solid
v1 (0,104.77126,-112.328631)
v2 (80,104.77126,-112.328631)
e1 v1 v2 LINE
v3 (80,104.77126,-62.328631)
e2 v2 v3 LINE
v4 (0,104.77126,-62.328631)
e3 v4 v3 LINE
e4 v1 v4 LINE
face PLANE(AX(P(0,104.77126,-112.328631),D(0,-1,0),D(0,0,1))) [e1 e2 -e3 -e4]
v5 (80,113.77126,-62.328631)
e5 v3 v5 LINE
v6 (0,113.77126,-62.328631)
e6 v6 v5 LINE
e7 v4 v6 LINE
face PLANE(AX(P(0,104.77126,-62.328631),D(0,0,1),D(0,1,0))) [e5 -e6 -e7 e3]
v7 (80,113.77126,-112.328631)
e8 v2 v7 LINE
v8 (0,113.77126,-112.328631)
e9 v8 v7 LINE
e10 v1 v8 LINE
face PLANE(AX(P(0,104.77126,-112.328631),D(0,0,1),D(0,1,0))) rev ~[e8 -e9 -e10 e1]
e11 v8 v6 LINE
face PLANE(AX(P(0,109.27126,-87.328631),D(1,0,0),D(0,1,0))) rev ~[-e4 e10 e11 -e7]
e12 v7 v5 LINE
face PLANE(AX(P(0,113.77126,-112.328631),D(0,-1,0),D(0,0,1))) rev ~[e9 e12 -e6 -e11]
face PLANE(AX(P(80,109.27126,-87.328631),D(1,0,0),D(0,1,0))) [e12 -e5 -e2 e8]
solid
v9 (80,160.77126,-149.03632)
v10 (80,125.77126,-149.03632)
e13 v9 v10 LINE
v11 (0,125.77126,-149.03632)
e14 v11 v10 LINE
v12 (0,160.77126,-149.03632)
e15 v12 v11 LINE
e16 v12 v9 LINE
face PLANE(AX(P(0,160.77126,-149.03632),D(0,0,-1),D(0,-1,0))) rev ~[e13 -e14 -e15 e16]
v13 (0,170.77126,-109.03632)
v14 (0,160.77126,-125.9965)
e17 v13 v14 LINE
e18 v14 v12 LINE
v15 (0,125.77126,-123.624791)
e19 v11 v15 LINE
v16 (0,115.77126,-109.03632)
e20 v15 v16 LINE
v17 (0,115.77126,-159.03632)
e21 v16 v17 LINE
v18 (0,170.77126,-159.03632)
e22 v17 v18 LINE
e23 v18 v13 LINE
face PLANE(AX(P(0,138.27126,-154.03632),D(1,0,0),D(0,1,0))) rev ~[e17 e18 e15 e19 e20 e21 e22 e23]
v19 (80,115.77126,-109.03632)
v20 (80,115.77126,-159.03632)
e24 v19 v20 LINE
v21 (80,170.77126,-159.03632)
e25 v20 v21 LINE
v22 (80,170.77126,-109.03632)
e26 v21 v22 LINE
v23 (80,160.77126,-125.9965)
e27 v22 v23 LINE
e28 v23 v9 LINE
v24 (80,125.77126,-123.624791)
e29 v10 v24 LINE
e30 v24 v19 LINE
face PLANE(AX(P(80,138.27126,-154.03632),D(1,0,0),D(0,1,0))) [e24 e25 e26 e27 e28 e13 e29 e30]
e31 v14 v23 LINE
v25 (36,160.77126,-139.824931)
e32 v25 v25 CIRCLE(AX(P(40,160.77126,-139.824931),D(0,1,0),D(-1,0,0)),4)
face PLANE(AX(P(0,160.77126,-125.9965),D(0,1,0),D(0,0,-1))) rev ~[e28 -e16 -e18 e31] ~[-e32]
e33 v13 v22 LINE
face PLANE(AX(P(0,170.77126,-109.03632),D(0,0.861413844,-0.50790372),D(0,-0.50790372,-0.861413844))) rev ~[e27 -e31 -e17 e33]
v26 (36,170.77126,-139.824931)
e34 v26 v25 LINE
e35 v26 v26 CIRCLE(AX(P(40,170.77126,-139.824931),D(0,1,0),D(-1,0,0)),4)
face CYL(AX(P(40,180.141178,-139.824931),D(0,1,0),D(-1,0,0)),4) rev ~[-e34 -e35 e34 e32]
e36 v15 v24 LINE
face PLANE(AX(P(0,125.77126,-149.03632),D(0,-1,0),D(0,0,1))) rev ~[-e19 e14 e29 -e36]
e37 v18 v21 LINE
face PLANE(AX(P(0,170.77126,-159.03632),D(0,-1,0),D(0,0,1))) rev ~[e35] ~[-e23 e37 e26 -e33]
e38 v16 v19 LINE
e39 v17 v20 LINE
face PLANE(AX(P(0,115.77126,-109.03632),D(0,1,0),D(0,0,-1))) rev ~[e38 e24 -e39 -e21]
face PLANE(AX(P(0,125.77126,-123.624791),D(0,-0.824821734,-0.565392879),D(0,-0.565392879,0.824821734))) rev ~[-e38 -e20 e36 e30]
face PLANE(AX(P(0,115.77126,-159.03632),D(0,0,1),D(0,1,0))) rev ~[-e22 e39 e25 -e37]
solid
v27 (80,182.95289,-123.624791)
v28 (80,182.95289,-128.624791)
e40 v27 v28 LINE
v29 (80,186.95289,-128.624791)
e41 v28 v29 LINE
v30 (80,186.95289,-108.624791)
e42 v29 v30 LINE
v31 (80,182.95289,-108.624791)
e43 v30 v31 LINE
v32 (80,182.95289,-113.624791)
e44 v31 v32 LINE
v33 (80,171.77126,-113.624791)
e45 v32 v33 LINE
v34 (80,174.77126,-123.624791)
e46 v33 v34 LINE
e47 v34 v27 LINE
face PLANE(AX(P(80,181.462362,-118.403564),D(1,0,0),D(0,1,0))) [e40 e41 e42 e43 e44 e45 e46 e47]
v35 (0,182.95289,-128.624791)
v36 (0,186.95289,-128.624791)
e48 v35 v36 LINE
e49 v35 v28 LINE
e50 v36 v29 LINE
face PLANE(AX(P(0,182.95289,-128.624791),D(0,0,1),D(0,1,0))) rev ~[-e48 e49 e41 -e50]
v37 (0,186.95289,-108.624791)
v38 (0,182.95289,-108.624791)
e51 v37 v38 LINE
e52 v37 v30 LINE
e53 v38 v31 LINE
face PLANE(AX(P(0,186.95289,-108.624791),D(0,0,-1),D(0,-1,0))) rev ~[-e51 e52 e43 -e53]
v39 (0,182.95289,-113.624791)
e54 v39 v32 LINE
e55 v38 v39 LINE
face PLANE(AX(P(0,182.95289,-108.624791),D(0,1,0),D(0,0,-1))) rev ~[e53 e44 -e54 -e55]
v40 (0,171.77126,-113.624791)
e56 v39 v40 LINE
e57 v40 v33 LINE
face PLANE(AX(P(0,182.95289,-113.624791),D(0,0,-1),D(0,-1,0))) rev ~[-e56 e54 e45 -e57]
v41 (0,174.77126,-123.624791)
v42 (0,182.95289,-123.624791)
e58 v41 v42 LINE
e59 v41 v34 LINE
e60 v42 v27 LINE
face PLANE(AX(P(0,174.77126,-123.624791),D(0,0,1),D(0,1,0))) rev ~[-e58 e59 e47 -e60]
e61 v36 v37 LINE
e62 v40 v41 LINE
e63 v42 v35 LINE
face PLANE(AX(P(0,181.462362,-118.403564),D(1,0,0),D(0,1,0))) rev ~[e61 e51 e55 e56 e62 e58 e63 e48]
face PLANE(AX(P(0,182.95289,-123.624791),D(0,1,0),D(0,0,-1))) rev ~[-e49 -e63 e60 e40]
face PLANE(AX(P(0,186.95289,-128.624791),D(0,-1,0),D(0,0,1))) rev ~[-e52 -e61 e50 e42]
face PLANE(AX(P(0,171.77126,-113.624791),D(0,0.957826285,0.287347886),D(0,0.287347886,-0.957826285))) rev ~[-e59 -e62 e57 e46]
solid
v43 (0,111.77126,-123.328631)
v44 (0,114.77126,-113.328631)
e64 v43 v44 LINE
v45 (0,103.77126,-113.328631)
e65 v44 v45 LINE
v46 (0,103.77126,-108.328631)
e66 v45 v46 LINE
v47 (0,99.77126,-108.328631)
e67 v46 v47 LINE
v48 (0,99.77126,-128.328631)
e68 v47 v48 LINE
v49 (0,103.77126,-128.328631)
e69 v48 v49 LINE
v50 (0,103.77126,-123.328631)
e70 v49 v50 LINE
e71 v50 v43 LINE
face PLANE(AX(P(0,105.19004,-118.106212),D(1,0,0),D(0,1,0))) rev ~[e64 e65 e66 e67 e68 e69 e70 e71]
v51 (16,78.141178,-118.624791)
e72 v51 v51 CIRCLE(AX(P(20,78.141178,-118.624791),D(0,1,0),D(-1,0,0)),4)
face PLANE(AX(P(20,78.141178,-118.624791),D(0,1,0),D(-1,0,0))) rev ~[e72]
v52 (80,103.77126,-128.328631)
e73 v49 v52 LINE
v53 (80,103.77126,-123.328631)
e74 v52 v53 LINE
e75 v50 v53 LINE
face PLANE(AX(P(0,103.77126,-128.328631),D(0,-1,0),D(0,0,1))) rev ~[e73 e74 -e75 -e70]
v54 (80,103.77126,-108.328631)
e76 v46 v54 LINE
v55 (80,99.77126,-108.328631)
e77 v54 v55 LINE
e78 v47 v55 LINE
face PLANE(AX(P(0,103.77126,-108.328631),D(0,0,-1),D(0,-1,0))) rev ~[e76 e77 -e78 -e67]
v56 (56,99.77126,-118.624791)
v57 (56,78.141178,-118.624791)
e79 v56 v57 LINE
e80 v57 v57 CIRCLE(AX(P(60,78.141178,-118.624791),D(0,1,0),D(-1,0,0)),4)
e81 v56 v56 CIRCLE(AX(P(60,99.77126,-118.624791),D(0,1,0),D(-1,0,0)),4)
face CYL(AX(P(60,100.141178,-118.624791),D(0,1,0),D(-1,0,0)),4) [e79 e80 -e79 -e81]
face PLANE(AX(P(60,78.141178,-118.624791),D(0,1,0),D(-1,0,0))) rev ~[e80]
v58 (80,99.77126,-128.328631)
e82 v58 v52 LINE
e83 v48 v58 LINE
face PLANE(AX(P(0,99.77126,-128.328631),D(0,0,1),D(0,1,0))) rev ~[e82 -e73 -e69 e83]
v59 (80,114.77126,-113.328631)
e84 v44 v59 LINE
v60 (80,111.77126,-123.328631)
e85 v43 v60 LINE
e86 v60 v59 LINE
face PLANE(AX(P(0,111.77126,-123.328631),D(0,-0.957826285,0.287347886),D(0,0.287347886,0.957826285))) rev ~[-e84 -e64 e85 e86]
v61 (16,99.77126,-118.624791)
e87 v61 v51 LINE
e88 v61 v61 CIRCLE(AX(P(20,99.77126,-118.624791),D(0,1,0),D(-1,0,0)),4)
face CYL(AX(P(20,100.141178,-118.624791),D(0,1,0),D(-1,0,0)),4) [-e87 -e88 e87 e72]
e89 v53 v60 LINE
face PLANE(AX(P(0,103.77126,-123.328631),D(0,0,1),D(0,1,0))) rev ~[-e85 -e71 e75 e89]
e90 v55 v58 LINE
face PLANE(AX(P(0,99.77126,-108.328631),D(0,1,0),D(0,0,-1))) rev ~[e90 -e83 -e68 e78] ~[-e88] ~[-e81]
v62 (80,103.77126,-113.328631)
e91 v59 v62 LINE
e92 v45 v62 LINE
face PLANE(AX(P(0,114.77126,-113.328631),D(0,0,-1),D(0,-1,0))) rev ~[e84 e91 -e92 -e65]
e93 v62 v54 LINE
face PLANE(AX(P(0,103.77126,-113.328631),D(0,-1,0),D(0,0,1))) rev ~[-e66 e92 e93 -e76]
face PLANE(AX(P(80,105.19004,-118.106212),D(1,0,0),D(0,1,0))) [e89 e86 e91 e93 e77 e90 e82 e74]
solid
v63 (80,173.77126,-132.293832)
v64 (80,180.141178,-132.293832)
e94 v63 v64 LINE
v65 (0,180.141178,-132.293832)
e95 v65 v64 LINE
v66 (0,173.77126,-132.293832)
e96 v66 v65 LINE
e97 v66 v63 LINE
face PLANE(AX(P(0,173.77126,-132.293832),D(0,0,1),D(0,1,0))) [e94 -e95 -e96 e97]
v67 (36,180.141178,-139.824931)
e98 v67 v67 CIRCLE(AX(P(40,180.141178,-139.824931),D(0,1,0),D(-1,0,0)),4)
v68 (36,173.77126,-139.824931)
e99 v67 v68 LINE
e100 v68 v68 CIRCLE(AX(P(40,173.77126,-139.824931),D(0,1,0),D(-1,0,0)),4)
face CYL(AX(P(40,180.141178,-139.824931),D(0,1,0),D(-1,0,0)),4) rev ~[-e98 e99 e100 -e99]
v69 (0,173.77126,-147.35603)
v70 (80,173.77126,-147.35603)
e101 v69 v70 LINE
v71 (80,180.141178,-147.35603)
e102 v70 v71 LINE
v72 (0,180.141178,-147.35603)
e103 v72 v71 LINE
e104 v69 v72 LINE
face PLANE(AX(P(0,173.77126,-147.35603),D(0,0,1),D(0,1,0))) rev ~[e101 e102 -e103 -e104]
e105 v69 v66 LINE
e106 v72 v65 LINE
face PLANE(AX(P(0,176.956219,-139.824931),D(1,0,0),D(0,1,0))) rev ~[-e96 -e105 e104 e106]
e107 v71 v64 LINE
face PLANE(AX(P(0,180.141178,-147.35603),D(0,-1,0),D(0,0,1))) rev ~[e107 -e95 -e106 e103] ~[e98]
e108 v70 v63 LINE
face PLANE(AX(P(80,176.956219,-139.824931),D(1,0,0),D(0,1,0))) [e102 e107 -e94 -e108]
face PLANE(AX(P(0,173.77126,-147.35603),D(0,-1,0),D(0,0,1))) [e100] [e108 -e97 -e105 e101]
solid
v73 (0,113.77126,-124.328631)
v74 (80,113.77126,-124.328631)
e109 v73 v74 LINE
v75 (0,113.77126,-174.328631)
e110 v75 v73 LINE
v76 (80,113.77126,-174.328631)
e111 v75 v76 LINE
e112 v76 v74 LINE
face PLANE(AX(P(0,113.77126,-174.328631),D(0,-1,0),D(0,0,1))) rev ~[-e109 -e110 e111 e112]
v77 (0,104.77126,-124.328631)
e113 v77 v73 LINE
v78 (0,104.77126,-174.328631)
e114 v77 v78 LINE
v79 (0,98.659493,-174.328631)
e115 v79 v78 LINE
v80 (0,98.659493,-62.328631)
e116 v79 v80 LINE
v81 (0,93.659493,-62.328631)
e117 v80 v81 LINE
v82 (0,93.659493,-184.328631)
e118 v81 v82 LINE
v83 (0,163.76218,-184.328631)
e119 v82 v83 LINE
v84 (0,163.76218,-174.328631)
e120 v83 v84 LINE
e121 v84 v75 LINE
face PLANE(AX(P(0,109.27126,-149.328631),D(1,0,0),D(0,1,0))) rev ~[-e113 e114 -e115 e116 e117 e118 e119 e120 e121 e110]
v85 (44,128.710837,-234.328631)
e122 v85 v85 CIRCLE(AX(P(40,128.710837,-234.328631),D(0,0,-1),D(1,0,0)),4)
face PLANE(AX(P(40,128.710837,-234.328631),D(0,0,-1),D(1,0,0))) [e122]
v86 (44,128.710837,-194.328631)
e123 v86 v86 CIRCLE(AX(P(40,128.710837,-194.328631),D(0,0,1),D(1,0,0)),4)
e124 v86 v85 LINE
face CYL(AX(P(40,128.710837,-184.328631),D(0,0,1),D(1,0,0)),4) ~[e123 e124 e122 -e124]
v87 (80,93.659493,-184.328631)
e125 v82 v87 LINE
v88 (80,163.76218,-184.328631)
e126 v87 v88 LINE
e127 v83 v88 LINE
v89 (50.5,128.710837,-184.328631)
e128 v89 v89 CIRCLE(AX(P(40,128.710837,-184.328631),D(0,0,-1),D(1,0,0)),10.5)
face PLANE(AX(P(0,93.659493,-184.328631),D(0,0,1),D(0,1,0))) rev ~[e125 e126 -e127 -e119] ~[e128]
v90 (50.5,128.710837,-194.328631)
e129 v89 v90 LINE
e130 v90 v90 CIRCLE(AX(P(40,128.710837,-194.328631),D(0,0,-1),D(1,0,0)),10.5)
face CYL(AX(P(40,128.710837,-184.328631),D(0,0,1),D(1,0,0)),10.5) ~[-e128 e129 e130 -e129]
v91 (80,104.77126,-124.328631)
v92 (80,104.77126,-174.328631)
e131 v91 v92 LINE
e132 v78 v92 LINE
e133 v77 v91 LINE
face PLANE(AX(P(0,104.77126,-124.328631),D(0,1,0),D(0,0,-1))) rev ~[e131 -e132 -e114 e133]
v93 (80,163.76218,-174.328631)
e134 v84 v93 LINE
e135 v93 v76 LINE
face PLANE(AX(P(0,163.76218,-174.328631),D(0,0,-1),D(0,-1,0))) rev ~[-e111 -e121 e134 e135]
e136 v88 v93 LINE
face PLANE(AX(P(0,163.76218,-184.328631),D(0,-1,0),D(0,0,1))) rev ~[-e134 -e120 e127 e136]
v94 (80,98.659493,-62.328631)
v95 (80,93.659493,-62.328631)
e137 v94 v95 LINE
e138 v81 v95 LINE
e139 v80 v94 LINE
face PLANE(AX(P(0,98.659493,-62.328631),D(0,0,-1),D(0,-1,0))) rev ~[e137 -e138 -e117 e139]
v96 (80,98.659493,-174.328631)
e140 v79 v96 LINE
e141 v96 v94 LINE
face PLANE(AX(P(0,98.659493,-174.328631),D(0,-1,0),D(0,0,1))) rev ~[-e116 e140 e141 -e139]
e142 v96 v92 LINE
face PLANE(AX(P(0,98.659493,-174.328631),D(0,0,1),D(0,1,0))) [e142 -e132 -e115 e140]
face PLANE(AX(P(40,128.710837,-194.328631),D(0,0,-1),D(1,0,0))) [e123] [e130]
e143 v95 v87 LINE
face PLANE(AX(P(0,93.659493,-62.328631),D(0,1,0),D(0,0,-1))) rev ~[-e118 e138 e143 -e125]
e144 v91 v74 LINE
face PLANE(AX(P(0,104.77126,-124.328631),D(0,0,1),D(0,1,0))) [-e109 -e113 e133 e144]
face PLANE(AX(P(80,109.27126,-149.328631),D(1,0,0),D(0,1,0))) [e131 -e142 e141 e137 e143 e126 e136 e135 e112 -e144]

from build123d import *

# Parameters (mm, degrees)
F1_DEPTH = 80
F0_W     = 9
F0_H     = 50
F0_W_2   = 6.1117671594
F0_H_2   = 10
F0_W_3   = 6.3699182272
F0_H_3   = 15.0621980429
F2_R     = 4
F4_DEPTH = 36.3
F5_START = -111
F5_DEPTH = 89
F6_START = -80
F6_DEPTH = 22
F7_R     = 4
F8_DEPTH = 50
F7_R_2   = 10.5
F9_DEPTH = 10


# Not quite as in the source:
# - a feature of the source that left no trace in its solid (it failed there, or was rolled back) is left out


with BuildPart() as f1:
    # F0 (on Right) → F1 (new body)
    with BuildSketch(Plane.YZ):
        Polygon((115.7712601885, -159.0363204131), (160.7712601885, -159.0363204131), (160.7712601885, -149.0363204131), (125.7712601885, -149.0363204131), (115.7712601885, -149.0363204131), align=None)
        Polygon((115.7712601885, -149.0363204131), (125.7712601885, -149.0363204131), (125.7712601885, -123.6247909078), (115.7712601885, -109.0363204131), align=None)
        Polygon((170.7712601885, -159.0363204131), (170.7712601885, -109.0363204131), (160.7712601885, -125.9965002537), (160.7712601885, -149.0363204131), (160.7712601885, -159.0363204131), align=None)
    extrude(amount=F1_DEPTH)


with BuildPart() as f1b:
    # F0 (on Right) → F1, piece 2 (new body)
    with BuildSketch(Plane.YZ):
        with Locations((109.2712601885, -87.3286305666)):
            Rectangle(F0_W, F0_H)
    extrude(amount=F1_DEPTH)


with BuildPart() as f1c:
    # F0 (on Right) → F1, piece 3 (new body)
    with BuildSketch(Plane.YZ):
        Polygon((103.7712601885, -128.3286305666), (103.7712601885, -123.3286305666), (111.7712601885, -123.3286305666), (114.7712601885, -113.3286305666), (103.7712601885, -113.3286305666), (103.7712601885, -108.3286305666), (99.7712601885, -108.3286305666), (99.7712601885, -128.3286305666), align=None)
    extrude(amount=F1_DEPTH)

    # F2 (on face) → F6 (join)
    with BuildSketch(Plane(origin=(0, 180.1411784157, 0), x_dir=(-1, 0, 0), z_dir=(0, 1, 0)).offset(F6_START)):
        with Locations((-60, -118.6247909078)):
            Circle(F2_R)
        with Locations((-20, -118.6247909078)):
            Circle(F2_R)
    extrude(amount=-F6_DEPTH)


with BuildPart() as f1d:
    # F0 (on Right) → F1, piece 4 (new body)
    with BuildSketch(Plane.YZ):
        with Locations((109.2712601885, -149.3286305666)):
            Rectangle(F0_W, F0_H)
        Polygon((163.7621800169, -174.3286305666), (113.7712601885, -174.3286305666), (104.7712601885, -174.3286305666), (104.7712601885, -184.3286305666), (163.7621800169, -184.3286305666), align=None)
        Polygon((98.6594930291, -184.3286305666), (98.6594930291, -174.3286305666), (98.6594930291, -62.3286305666), (93.6594930291, -62.3286305666), (93.6594930291, -184.3286305666), align=None)
        with Locations((101.7153766088, -179.3286305666)):
            Rectangle(F0_W_2, F0_H_2)
    extrude(amount=F1_DEPTH)

    # F7 (on face) → F8 (join)
    with BuildSketch(Plane(origin=(0, 0, -184.3286305666), x_dir=(1, 0, 0), z_dir=(0, 0, -1))):
        with Locations((40, -128.710836523)):
            Circle(F7_R)
    extrude(amount=F8_DEPTH)

    # F7 (on face) → F9 (join)
    with BuildSketch(Plane(origin=(0, 0, -184.3286305666), x_dir=(1, 0, 0), z_dir=(0, 0, -1))):
        with Locations((40, -128.710836523)):
            Circle(F7_R_2)
        with Locations((40, -128.710836523)):
            Circle(F7_R, mode=Mode.SUBTRACT)
        with Locations((40, -128.710836523)):
            Circle(F7_R)
    extrude(amount=F9_DEPTH)


with BuildPart() as f1e:
    # F0 (on Right) → F1, piece 5 (new body)
    with BuildSketch(Plane.YZ):
        Polygon((186.9528900847, -128.6247909078), (186.9528900847, -108.6247909078), (182.9528900847, -108.6247909078), (182.9528900847, -113.6247909078), (171.7712601885, -113.6247909078), (174.7712601885, -123.6247909078), (182.9528900847, -123.6247909078), (182.9528900847, -128.6247909078), align=None)
    extrude(amount=F1_DEPTH)


with BuildPart() as f1f:
    # F0 (on Right) → F1, piece 6 (new body)
    with BuildSketch(Plane.YZ):
        with Locations((176.9562193021, -139.8249312887)):
            Rectangle(F0_W_3, F0_H_3)
    extrude(amount=F1_DEPTH)


with BuildPart() as f4_tool:
    # F2 (on face) → F4 (new body)
    with BuildSketch(Plane(origin=(0, 180.1411784157, 0), x_dir=(-1, 0, 0), z_dir=(0, 1, 0))):
        with Locations((-40, -139.8249312887)):
            Circle(F2_R)
    extrude(amount=-F4_DEPTH)


with BuildPart() as f1_1:
    add(f1.part)

    # F4: cut by f4_tool
    add(f4_tool.part, mode=Mode.SUBTRACT)

    # F2 (on face) → F5 (cut)
    with BuildSketch(Plane(origin=(0, 180.1411784157, 0), x_dir=(-1, 0, 0), z_dir=(0, 1, 0)).offset(F5_START)):
        with Locations((-60, -118.6247909078)):
            Circle(F2_R)
        with Locations((-20, -118.6247909078)):
            Circle(F2_R)
    extrude(amount=-F5_DEPTH, mode=Mode.SUBTRACT)


with BuildPart() as f1f_1:
    add(f1f.part)

    # F4: cut by f4_tool
    add(f4_tool.part, mode=Mode.SUBTRACT)


solid = Compound([f1b.part, f1c.part, f1d.part, f1e.part, f1_1.part, f1f_1.part])
